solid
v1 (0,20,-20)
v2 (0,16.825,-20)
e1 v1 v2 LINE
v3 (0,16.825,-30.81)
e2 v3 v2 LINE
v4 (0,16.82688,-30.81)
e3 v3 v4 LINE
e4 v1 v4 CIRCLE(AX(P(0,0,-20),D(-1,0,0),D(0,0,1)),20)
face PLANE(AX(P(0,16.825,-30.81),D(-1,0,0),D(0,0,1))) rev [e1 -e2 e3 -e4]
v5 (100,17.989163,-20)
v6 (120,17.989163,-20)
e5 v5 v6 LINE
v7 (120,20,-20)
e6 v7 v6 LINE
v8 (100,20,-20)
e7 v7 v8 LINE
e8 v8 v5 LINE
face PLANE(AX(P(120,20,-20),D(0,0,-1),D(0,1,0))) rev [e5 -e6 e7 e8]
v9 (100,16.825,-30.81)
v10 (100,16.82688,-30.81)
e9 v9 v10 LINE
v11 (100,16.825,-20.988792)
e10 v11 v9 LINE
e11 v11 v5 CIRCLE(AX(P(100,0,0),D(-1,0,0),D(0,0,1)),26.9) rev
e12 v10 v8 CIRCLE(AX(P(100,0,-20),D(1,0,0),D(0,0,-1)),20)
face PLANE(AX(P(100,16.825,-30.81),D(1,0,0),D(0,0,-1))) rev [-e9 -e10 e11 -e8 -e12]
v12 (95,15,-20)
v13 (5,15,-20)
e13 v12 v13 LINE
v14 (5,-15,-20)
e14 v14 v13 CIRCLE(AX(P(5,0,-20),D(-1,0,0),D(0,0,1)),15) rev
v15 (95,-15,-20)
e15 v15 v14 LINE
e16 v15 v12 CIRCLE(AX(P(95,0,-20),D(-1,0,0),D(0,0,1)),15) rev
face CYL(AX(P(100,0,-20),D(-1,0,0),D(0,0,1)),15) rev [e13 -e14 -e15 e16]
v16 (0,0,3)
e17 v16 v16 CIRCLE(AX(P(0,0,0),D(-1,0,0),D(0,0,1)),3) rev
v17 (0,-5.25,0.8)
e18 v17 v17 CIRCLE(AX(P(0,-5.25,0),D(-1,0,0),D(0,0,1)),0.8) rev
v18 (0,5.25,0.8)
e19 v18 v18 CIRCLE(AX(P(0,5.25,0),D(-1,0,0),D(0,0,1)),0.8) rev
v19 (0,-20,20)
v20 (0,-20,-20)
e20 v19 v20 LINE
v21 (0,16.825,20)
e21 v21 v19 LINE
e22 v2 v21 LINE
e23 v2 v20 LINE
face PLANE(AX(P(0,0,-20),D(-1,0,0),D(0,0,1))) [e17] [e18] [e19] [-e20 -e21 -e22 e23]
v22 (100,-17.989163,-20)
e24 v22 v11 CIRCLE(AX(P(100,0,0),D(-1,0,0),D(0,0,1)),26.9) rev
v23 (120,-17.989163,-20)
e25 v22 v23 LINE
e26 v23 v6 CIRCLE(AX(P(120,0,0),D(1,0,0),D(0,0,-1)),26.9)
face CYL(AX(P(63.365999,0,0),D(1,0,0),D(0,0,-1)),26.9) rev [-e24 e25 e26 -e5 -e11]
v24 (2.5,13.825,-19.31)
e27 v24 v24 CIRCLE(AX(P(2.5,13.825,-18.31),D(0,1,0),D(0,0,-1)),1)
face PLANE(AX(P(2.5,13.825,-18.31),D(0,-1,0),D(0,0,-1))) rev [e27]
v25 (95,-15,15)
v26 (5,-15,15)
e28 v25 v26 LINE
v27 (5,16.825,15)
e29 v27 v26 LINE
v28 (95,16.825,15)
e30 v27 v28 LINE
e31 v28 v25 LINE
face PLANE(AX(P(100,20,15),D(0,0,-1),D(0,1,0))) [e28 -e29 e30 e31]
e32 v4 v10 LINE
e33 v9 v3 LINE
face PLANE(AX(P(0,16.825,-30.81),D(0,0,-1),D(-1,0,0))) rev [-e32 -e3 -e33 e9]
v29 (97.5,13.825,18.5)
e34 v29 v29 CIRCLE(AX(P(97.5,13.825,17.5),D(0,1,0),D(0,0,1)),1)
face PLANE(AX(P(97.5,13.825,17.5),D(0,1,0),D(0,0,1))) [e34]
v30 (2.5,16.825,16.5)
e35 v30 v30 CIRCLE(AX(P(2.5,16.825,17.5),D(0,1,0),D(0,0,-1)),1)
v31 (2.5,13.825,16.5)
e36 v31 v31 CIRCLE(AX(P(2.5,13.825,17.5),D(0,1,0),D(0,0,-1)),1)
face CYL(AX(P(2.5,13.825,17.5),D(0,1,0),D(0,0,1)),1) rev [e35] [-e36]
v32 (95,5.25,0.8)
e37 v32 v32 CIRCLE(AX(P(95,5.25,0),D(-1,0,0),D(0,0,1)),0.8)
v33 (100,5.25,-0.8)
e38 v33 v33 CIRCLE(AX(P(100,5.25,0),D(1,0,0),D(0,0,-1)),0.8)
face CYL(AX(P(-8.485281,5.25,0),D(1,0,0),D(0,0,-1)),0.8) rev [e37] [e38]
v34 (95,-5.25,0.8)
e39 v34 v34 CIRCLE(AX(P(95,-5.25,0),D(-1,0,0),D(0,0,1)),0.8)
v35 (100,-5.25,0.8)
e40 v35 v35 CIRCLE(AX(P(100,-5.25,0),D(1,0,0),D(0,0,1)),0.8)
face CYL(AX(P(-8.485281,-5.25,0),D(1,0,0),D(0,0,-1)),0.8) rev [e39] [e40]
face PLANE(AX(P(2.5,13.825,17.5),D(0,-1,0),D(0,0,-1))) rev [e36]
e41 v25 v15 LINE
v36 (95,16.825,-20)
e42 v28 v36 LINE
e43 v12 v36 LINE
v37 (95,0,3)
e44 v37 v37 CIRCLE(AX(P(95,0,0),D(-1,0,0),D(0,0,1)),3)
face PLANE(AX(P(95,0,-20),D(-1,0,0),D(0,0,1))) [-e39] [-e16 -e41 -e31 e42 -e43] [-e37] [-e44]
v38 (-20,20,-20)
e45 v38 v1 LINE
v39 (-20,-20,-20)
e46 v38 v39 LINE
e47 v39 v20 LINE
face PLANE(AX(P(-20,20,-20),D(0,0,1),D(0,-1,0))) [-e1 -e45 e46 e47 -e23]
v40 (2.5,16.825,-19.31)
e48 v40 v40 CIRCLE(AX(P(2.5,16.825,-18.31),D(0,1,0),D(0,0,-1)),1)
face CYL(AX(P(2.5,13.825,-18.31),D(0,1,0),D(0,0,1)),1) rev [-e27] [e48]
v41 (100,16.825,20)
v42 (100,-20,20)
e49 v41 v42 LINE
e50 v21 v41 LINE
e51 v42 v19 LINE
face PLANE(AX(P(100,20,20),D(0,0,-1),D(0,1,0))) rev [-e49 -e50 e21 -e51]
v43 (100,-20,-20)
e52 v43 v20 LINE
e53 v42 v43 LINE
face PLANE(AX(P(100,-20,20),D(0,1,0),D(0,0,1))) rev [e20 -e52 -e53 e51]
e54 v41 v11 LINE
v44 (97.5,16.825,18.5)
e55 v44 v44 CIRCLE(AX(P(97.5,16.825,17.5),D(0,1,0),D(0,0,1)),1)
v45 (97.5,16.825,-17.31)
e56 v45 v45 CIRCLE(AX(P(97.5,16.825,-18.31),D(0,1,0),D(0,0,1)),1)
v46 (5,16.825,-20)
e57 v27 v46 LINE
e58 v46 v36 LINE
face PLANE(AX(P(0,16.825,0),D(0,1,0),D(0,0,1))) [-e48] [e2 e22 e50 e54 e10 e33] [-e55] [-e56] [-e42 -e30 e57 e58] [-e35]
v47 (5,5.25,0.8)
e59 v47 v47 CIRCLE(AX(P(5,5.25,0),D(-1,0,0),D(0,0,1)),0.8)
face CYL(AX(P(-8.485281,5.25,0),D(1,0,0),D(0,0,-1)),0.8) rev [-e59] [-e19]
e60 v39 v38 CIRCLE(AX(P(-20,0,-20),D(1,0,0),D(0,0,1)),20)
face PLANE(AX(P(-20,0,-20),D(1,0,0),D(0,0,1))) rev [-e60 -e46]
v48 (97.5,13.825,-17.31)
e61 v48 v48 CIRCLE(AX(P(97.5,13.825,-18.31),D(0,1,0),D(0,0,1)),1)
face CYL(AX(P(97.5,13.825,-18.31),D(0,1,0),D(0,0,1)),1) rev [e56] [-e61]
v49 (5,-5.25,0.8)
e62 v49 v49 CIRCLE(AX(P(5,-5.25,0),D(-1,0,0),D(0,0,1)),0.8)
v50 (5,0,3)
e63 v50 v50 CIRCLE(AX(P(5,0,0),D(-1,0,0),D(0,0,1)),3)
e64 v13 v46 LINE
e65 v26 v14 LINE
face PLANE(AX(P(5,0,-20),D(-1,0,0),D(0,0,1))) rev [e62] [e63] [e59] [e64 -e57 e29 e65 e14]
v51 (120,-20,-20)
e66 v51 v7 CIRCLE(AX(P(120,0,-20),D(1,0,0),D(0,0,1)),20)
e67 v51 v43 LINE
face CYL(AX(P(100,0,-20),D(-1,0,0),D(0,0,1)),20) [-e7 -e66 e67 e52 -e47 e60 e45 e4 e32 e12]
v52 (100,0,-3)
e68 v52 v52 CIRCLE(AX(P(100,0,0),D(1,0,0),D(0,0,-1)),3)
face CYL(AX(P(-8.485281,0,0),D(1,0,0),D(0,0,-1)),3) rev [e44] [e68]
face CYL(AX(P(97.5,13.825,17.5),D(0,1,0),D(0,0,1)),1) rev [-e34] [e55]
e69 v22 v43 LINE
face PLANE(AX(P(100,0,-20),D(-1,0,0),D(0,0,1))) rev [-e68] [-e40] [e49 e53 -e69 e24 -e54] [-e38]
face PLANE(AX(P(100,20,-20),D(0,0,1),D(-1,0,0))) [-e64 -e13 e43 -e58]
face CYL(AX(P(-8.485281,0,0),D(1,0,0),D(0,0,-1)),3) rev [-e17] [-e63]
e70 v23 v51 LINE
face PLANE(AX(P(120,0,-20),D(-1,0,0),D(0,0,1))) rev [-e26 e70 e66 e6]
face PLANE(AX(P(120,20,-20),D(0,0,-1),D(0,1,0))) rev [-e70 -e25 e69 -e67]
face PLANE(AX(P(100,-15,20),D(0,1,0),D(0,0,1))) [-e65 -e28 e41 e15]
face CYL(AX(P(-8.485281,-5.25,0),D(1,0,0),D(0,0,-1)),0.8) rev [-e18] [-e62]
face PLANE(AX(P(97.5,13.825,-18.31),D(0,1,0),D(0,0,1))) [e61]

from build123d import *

# Parameters (mm, degrees)
BOSS_EXTRUDE1_DEPTH = 100
SHELL3_START        = 5
SHELL3_DEPTH        = 90
BOSS_EXTRUDE2_DEPTH = 20
SKETCH7_W           = 100
SKETCH7_H           = 50.81
CUT_EXTRUDE6_DEPTH  = 3.175
CUT_EXTRUDE1_REACH  = 130.062
SKETCH2_R           = 0.8
SKETCH2_R_2         = 3
SKETCH8_R           = 1
CUT_EXTRUDE7_DEPTH  = 3
CUT_EXTRUDE8_DEPTH  = 20


# Read off the part's stored shape, not the designer's step: Shell3
with BuildPart() as part:
    # Sketch1 → Boss-Extrude1 (new body)
    with BuildSketch(Plane(origin=(0, 0, 0), x_dir=(0, 0, -1), z_dir=(1, 0, 0))):
        with BuildLine():
            Line((-20, 20), (20, 20))
            ThreePointArc((20, 20), (40, 0), (20, -20))
            Line((20, -20), (-20, -20))
            Line((-20, -20), (-20, 20))
        make_face()
    extrude(amount=BOSS_EXTRUDE1_DEPTH)

    # Shell3 outline → Shell3 (cut)
    with BuildSketch(Plane.YZ.offset(SHELL3_START)):
        with BuildLine():
            Line((15, -20), (20, -20))
            Line((20, -20), (20, 15))
            Line((20, 15), (-15, 15))
            Line((-15, 15), (-15, -20))
            ThreePointArc((-15, -20), (0, -35), (15, -20))
        make_face()
    extrude(amount=SHELL3_DEPTH, mode=Mode.SUBTRACT)

    # Sketch9 → Boss-Extrude2 (add)
    with BuildSketch(Plane(origin=(100, 0, 0), x_dir=(0, 0, -1), z_dir=(1, 0, 0))):
        with BuildLine():
            Line((20, 20), (20, -20))
            ThreePointArc((20, -20), (40, 0), (20, 20))
        make_face()
    boss_extrude2 = extrude(amount=BOSS_EXTRUDE2_DEPTH)

    # Mirror1: Boss-Extrude2 across plane
    add(boss_extrude2.mirror(Plane(origin=(50, 0, 0), x_dir=(0, 0, 1), z_dir=(1, 0, 0))))

    # Sketch7 → Cut-Extrude6 (cut)
    with BuildSketch(Plane(origin=(0, 20, 0), x_dir=(1, 0, 0), z_dir=(0, 1, 0))):
        with Locations((50, 5.405)):
            Rectangle(SKETCH7_W, SKETCH7_H)
    extrude(amount=-CUT_EXTRUDE6_DEPTH, mode=Mode.SUBTRACT)

    # Cut-Extrude1: up to this face of the body (flat: up to its plane)
    cut_extrude1_end = Plane(part.part.faces().sort_by_distance((0, -1.5875, 0))[0])
    # Sketch2 → Cut-Extrude1 (cut, up to the picked face)
    with BuildSketch(Plane(origin=(100, 0, 0), x_dir=(0, 0, -1), z_dir=(1, 0, 0)), mode=Mode.PRIVATE) as cut_extrude1_sk1:
        with Locations(Location((0, -5.25, 0), (0, 0, 180))):
            Circle(SKETCH2_R)
    cut_extrude1_tool1 = split(extrude(cut_extrude1_sk1.sketch, amount=-CUT_EXTRUDE1_REACH, mode=Mode.PRIVATE), bisect_by=cut_extrude1_end, keep=Keep.BOTH, mode=Mode.PRIVATE)
    # Sketch2 → Cut-Extrude1 (cut, up to the picked face)
    with BuildSketch(Plane(origin=(100, 0, 0), x_dir=(0, 0, -1), z_dir=(1, 0, 0)), mode=Mode.PRIVATE) as cut_extrude1_sk2:
        with Locations(Location((0, 0, 0), (0, 0, 180))):
            Circle(SKETCH2_R_2)
    cut_extrude1_tool2 = split(extrude(cut_extrude1_sk2.sketch, amount=-CUT_EXTRUDE1_REACH, mode=Mode.PRIVATE), bisect_by=cut_extrude1_end, keep=Keep.BOTH, mode=Mode.PRIVATE)
    # Sketch2 → Cut-Extrude1 (cut, up to the picked face)
    with BuildSketch(Plane(origin=(100, 0, 0), x_dir=(0, 0, -1), z_dir=(1, 0, 0)), mode=Mode.PRIVATE) as cut_extrude1_sk3:
        with Locations(Location((0, 5.25, 0), (0, 0, 180))):
            Circle(SKETCH2_R)
    cut_extrude1_tool3 = split(extrude(cut_extrude1_sk3.sketch, amount=-CUT_EXTRUDE1_REACH, mode=Mode.PRIVATE), bisect_by=cut_extrude1_end, keep=Keep.BOTH, mode=Mode.PRIVATE)
    add(cut_extrude1_tool1.solids().sort_by(Axis((100, -5.25, 0), (-1, 0, 0)))[0], mode=Mode.SUBTRACT)
    add(cut_extrude1_tool2.solids().sort_by(Axis((100, 0, 0), (-1, 0, 0)))[0], mode=Mode.SUBTRACT)
    add(cut_extrude1_tool3.solids().sort_by(Axis((100, 5.25, 0), (-1, 0, 0)))[0], mode=Mode.SUBTRACT)

    # Sketch8 → Cut-Extrude7 (cut)
    with BuildSketch(Plane(origin=(0, 16.825, 0), x_dir=(1, 0, 0), z_dir=(0, 1, 0))):
        with Locations(Location((97.5, -17.5, 0), (0, 0, 270))):
            Circle(SKETCH8_R)
        with Locations(Location((97.5, 18.31, 0), (0, 0, 270))):
            Circle(SKETCH8_R)
        with Locations(Location((2.5, -17.5, 0), (0, 0, 90))):
            Circle(SKETCH8_R)
        with Locations(Location((2.5, 18.31, 0), (0, 0, 90))):
            Circle(SKETCH8_R)
    extrude(amount=-CUT_EXTRUDE7_DEPTH, mode=Mode.SUBTRACT)

    # Sketch10 → Cut-Extrude8 (cut)
    with BuildSketch(Plane(origin=(120, 0, 0), x_dir=(0, 0, -1), z_dir=(1, 0, 0))):
        with BuildLine():
            Line((20, 17.989163405), (20, -17.989163405))
            ThreePointArc((20, -17.989163405), (26.9, 0), (20, 17.989163405))
        make_face()
    extrude(amount=-CUT_EXTRUDE8_DEPTH, mode=Mode.SUBTRACT)


solid = part.part
